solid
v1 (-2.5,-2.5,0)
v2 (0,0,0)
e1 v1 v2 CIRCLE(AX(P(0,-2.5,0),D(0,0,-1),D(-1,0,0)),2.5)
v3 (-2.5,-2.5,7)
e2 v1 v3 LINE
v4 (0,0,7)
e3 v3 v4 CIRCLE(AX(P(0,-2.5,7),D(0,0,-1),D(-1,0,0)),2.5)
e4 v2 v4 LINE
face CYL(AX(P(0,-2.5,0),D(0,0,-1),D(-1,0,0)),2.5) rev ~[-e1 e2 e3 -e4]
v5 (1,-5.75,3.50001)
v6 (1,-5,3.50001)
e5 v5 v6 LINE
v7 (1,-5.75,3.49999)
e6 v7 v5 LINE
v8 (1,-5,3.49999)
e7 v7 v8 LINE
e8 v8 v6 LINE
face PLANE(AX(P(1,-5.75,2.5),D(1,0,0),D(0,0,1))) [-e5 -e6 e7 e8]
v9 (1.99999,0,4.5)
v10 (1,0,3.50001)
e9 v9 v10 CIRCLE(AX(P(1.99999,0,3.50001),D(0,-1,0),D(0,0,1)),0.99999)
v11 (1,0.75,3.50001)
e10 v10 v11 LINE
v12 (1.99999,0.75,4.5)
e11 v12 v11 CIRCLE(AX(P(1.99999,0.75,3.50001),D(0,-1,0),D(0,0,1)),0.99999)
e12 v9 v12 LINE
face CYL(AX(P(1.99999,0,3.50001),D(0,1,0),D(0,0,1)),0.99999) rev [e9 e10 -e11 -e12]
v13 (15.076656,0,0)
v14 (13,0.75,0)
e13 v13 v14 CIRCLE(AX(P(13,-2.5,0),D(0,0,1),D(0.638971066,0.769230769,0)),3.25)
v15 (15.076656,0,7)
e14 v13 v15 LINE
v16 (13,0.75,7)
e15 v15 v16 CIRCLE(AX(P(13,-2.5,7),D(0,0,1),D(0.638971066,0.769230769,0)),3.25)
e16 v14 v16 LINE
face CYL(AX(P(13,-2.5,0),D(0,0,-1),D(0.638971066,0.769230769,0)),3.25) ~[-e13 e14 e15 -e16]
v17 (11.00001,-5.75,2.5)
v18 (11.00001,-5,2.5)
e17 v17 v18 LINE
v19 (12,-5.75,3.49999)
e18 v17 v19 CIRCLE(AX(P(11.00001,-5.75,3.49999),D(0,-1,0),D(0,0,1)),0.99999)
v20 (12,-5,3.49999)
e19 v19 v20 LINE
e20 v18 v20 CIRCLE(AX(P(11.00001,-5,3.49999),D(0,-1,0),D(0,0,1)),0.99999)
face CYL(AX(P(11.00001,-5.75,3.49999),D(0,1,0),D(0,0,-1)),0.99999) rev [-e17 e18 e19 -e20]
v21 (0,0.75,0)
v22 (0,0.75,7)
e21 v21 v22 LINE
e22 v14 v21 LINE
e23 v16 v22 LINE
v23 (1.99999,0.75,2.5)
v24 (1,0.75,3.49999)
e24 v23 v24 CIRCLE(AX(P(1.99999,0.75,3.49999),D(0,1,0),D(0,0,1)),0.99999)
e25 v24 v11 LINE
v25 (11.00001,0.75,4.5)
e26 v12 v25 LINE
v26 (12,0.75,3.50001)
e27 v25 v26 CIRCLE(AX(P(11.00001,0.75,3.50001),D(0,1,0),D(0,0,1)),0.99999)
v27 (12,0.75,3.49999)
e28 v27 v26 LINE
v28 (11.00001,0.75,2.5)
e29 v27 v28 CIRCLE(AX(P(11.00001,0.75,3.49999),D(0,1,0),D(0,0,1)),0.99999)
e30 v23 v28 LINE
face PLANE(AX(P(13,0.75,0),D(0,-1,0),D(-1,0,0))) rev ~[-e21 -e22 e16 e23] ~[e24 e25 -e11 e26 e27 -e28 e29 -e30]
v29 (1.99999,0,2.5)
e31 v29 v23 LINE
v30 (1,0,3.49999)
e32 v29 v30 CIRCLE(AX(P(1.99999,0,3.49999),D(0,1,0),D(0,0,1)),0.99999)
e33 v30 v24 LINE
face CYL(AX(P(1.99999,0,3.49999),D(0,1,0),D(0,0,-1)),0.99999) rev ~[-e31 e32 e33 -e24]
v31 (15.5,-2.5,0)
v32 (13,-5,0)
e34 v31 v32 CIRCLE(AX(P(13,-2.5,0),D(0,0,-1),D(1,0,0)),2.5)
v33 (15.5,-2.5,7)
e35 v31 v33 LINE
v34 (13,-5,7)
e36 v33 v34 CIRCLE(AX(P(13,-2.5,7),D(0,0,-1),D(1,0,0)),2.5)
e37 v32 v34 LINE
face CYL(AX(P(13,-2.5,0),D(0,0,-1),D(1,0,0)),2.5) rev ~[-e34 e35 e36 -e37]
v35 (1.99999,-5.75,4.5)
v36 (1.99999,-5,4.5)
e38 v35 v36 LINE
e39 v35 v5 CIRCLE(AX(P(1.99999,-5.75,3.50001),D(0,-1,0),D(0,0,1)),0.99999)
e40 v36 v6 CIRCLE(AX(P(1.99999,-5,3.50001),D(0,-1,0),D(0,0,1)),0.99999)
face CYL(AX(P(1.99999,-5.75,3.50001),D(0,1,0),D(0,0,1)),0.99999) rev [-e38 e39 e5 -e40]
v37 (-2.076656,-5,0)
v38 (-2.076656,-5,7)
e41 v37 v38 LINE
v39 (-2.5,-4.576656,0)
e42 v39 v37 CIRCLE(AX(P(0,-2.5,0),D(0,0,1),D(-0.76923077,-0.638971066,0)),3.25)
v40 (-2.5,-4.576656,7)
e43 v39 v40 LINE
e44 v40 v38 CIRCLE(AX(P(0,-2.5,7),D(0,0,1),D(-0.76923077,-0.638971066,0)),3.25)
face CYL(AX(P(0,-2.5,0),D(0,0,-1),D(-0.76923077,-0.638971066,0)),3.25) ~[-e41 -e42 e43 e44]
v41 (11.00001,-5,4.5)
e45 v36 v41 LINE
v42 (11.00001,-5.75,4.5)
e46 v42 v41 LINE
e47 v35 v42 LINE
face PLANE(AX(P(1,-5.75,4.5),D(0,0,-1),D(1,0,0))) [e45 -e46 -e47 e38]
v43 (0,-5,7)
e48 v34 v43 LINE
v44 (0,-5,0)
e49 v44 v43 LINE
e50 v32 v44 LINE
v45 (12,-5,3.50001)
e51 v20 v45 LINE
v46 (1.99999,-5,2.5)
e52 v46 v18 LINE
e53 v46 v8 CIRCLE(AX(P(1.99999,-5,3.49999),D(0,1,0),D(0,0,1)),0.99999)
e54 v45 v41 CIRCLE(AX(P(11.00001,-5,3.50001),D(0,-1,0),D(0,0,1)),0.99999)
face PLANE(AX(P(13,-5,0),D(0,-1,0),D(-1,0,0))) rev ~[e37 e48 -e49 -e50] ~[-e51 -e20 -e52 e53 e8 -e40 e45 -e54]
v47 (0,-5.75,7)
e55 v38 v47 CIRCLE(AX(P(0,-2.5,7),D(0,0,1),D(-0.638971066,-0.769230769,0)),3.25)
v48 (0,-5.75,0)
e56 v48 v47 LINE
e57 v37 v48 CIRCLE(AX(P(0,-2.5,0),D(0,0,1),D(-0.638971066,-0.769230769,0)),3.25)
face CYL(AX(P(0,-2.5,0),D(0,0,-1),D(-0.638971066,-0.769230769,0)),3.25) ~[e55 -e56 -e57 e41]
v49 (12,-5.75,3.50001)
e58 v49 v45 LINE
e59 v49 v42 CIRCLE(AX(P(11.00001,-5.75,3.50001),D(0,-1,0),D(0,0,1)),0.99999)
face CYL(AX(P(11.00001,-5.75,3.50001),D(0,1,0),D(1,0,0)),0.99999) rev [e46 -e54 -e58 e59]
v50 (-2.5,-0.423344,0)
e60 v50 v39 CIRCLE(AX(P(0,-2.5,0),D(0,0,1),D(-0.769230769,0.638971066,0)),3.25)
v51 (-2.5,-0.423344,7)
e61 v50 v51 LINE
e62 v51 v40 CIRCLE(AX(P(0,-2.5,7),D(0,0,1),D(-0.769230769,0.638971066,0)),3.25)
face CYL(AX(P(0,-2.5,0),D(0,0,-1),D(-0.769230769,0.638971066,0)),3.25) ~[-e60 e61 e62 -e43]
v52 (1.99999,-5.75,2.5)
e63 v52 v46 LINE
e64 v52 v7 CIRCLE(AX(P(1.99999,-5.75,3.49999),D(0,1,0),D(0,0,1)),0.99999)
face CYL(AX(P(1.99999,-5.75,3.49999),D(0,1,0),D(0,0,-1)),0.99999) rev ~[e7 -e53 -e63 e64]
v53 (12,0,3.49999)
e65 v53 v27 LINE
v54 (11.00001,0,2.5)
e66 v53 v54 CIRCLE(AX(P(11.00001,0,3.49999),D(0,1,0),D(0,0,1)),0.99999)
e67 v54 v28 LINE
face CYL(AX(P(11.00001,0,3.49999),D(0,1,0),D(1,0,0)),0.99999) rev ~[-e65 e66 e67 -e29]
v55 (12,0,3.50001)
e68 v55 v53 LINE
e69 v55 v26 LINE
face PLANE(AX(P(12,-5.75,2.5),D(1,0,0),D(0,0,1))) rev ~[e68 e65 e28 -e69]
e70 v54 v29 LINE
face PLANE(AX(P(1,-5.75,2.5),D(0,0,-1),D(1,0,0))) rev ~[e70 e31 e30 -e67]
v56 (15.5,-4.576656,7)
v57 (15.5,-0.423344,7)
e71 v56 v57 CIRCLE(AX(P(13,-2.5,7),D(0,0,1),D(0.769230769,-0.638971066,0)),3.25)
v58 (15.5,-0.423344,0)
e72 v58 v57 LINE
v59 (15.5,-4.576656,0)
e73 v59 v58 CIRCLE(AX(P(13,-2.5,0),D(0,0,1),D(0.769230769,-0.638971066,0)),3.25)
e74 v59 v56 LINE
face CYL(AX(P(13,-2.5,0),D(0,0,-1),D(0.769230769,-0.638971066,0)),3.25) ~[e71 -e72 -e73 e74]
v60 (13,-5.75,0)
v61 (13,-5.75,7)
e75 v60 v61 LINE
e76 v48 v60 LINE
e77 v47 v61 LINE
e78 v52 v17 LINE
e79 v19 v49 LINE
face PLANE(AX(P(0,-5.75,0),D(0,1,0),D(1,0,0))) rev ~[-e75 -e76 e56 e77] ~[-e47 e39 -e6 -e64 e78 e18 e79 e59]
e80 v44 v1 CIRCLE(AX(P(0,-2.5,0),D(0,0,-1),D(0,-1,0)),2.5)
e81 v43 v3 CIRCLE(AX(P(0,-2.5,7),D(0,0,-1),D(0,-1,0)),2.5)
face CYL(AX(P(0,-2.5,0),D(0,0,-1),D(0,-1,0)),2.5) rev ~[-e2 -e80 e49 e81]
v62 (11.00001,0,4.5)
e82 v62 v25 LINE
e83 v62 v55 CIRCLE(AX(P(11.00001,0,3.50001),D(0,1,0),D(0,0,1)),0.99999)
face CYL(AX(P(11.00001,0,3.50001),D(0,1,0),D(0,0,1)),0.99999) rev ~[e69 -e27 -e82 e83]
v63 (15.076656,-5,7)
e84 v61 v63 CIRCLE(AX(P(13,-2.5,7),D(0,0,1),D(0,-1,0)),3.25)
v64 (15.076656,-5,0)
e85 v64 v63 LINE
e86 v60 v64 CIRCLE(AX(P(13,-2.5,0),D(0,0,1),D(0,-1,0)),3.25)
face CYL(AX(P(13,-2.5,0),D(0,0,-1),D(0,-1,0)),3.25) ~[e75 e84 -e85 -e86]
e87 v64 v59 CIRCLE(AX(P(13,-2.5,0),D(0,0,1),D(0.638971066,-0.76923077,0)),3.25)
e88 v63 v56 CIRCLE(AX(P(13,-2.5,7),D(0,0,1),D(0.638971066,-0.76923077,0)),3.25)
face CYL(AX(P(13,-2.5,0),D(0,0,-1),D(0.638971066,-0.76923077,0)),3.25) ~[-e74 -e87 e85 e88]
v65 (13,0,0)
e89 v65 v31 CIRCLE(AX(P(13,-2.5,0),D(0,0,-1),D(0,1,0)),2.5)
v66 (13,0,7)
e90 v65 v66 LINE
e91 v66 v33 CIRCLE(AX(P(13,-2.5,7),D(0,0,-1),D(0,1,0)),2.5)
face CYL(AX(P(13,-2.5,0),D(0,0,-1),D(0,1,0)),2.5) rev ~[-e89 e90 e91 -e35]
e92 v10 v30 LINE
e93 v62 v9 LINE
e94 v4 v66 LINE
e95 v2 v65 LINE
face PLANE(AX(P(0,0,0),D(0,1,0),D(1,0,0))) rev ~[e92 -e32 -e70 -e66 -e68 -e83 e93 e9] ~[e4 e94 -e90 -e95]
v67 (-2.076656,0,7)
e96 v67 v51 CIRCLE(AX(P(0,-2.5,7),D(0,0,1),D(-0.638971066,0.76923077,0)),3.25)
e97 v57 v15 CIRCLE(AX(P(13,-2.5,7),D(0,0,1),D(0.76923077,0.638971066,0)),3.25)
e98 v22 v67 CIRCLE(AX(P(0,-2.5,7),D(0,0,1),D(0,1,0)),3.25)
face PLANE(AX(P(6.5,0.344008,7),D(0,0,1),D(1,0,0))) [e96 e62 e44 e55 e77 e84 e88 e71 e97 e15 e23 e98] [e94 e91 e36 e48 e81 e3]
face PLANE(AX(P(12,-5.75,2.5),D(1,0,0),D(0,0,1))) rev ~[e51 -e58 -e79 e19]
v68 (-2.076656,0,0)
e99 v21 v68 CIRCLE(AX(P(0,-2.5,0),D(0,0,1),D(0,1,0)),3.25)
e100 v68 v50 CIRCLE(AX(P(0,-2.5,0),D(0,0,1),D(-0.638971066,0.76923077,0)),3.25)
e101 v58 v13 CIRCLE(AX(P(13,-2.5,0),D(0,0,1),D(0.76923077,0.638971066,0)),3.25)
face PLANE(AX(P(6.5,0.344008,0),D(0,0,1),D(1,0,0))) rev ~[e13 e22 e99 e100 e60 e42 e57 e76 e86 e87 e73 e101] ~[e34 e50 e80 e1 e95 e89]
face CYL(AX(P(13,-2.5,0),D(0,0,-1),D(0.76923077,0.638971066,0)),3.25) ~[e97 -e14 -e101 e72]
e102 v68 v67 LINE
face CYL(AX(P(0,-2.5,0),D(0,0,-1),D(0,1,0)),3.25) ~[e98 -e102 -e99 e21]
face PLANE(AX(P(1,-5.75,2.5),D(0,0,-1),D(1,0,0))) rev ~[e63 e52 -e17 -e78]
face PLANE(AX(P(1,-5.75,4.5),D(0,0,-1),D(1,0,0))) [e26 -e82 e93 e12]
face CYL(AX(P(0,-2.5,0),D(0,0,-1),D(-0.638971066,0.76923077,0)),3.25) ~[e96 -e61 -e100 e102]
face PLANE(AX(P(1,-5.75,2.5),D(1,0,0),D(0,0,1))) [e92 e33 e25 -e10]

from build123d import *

# Parameters (mm, degrees)
F1_DEPTH = 7
F2_W     = 11
F2_H     = 2
F3_DEPTH = 6.501
F4_R     = 0.99999


# Not quite as in the source:
# - a fillet or chamfer is up to 0.001 mm smaller than in the source, because OpenCascade refuses the exact size


with BuildPart() as f1:
    # F0 (on Top) → F1 (new body)
    with BuildSketch(Plane.XY):
        with BuildLine():
            Line((-2.0766559657, 0), (0, 0))
            Line((0, 0), (13, 0))
            Line((13, 0), (15.0766559657, 0))
            ThreePointArc((15.0766559657, 0), (14.1039701083, 0.5567548152), (13, 0.75))
            Line((13, 0.75), (0, 0.75))
            ThreePointArc((0, 0.75), (-1.1039701083, 0.5567548152), (-2.0766559657, 0))
        make_face()
        with BuildLine():
            ThreePointArc((-2.5, -2.5), (-1.767766953, -0.732233047), (0, 0))
            Line((0, 0), (-2.0766559657, 0))
            ThreePointArc((-2.0766559657, 0), (-2.2980970389, -0.2019029611), (-2.5, -0.4233440343))
            Line((-2.5, -0.4233440343), (-2.5, -2.5))
        make_face()
        with BuildLine():
            ThreePointArc((0, -5), (-1.767766953, -4.267766953), (-2.5, -2.5))
            Line((-2.5, -2.5), (-2.5, -4.5766559657))
            ThreePointArc((-2.5, -4.5766559657), (-2.2980970389, -4.7980970389), (-2.0766559657, -5))
            Line((-2.0766559657, -5), (0, -5))
        make_face()
        with BuildLine():
            Line((-2.5, -4.5766559657), (-2.5, -2.5))
            Line((-2.5, -2.5), (-2.5, -0.4233440343))
            ThreePointArc((-2.5, -0.4233440343), (-3.25, -2.5), (-2.5, -4.5766559657))
        make_face()
        with BuildLine():
            Line((15.5, -0.4233440343), (15.5, -2.5))
            Line((15.5, -2.5), (15.5, -4.5766559657))
            ThreePointArc((15.5, -4.5766559657), (16.25, -2.5), (15.5, -0.4233440343))
        make_face()
        with BuildLine():
            Line((15.0766559657, 0), (13, 0))
            ThreePointArc((13, 0), (14.767766953, -0.732233047), (15.5, -2.5))
            Line((15.5, -2.5), (15.5, -0.4233440343))
            ThreePointArc((15.5, -0.4233440343), (15.2980970389, -0.2019029611), (15.0766559657, 0))
        make_face()
        with BuildLine():
            Line((15.5, -4.5766559657), (15.5, -2.5))
            ThreePointArc((15.5, -2.5), (14.767766953, -4.267766953), (13, -5))
            Line((13, -5), (15.0766559657, -5))
            ThreePointArc((15.0766559657, -5), (15.2980970389, -4.7980970389), (15.5, -4.5766559657))
        make_face()
        with BuildLine():
            Line((13, -5), (0, -5))
            Line((0, -5), (-2.0766559657, -5))
            ThreePointArc((-2.0766559657, -5), (-1.1039701083, -5.5567548152), (0, -5.75))
            Line((0, -5.75), (13, -5.75))
            ThreePointArc((13, -5.75), (14.1039701083, -5.5567548152), (15.0766559657, -5))
            Line((15.0766559657, -5), (13, -5))
        make_face()
    extrude(amount=F1_DEPTH)

    # F2 (on face) → F3 (cut, through all)
    with BuildSketch(Plane.XZ.offset(5.75)):
        with Locations((6.5, 3.5)):
            Rectangle(F2_W, F2_H)
    extrude(amount=-F3_DEPTH, mode=Mode.SUBTRACT)

    # F4 (radius 1 in the source; OpenCascade refuses exactly that, so slightly less here)
    f4_edges = [f1.edges().sort_by_distance(p)[0] for p in [
        (1, -5.375, 4.5),
        (1, -5.375, 2.5),
        (12, -5.375, 2.5),
        (12, 0.375, 4.5),
        (12, -5.375, 4.5),
        (12, 0.375, 2.5),
        (1, 0.375, 2.5),
        (1, 0.375, 4.5),
    ]]
    fillet(f4_edges, radius=F4_R)


solid = f1.part
